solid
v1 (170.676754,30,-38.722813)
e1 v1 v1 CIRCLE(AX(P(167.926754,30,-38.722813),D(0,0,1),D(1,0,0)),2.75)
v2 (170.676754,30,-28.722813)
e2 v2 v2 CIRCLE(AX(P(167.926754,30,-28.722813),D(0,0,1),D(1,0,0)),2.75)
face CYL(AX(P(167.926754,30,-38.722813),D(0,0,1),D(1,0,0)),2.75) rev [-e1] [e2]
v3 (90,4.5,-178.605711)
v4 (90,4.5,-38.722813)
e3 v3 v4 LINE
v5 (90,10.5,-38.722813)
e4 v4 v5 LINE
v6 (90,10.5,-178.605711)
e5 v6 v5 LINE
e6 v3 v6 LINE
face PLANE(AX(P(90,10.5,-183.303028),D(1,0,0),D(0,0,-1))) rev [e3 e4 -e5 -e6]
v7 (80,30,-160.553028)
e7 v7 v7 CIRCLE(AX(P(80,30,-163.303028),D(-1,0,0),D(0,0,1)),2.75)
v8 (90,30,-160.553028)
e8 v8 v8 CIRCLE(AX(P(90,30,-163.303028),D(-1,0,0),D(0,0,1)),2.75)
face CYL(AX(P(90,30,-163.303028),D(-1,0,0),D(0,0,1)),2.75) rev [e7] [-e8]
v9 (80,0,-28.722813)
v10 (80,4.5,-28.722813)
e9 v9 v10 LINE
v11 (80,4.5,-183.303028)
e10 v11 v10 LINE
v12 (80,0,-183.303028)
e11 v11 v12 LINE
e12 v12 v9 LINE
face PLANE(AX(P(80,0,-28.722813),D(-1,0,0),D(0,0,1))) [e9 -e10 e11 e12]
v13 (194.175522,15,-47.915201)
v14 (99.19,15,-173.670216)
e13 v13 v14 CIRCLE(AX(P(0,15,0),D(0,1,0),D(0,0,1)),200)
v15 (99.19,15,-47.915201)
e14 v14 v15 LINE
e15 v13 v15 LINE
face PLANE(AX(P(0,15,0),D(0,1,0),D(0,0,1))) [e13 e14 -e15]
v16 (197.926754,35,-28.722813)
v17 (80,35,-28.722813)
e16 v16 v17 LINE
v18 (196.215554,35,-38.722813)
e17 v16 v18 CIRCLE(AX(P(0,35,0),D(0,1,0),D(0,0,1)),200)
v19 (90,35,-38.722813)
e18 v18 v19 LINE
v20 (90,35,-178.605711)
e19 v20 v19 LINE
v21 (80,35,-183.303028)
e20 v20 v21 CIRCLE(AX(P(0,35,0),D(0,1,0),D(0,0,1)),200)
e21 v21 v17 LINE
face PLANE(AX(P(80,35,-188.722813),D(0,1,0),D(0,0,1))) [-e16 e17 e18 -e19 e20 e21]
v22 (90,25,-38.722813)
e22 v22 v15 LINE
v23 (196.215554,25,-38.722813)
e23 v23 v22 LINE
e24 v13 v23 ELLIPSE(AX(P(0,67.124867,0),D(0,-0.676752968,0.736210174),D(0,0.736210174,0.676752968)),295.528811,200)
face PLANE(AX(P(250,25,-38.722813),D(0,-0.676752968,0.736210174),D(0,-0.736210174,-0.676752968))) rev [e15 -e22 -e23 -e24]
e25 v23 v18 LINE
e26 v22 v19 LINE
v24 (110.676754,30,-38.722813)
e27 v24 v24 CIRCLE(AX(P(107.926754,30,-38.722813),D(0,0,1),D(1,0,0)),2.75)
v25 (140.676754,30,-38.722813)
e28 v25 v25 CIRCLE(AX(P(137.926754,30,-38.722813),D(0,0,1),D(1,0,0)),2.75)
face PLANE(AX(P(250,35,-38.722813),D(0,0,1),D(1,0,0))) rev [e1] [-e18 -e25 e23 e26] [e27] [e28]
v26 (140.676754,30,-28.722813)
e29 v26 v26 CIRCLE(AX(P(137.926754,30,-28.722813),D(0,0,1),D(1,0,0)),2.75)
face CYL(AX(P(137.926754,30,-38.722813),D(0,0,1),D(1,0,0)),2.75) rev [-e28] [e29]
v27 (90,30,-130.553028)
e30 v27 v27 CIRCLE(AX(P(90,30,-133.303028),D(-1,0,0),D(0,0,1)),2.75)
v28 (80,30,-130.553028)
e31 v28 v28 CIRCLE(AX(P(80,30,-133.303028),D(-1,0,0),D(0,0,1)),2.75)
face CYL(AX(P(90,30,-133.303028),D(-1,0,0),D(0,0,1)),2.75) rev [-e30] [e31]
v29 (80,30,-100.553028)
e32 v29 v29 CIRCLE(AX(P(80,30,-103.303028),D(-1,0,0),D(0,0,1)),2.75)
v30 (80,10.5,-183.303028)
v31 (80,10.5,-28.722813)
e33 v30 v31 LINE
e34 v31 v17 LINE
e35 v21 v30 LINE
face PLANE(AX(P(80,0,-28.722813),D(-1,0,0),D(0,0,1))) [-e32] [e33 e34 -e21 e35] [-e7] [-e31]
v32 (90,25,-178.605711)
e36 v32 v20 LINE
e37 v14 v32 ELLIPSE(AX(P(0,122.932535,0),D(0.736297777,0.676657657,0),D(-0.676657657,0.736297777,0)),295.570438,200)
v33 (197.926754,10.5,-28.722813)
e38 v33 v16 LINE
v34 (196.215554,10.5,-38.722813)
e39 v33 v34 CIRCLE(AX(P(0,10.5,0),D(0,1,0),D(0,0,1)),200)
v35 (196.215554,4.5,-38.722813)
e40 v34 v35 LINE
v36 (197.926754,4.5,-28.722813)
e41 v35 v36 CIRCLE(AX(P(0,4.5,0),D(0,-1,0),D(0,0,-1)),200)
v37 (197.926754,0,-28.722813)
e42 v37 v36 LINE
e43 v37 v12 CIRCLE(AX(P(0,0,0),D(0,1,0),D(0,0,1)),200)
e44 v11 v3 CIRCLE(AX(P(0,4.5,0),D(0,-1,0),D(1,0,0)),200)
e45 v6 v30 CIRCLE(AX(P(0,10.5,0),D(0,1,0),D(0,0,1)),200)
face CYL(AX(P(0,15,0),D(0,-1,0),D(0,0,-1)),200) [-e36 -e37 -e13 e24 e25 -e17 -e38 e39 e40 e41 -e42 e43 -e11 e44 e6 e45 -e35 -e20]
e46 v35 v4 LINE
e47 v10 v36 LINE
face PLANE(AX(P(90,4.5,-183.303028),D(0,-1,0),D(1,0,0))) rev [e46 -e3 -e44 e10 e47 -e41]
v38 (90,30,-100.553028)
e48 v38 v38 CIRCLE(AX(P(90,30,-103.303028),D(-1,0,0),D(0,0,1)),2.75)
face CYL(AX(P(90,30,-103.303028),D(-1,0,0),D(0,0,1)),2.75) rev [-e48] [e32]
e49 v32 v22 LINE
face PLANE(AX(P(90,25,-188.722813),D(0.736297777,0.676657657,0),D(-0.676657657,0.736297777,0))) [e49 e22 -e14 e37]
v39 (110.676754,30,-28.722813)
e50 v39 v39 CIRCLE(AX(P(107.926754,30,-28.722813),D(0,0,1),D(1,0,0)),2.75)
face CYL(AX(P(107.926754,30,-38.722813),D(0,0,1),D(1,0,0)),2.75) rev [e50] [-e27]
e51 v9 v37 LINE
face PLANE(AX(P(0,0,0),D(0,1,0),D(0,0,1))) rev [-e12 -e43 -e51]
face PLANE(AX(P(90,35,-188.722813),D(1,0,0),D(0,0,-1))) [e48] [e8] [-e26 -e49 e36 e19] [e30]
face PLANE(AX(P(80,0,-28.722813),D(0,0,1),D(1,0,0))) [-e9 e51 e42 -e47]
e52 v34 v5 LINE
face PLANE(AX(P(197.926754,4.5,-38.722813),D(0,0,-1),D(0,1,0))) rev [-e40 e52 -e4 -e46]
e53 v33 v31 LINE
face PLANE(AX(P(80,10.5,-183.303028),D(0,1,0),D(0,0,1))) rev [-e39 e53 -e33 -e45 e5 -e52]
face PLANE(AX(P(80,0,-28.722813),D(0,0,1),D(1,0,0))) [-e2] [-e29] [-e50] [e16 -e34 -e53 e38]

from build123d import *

# Parameters (mm, degrees)
SKETCH1_R                = 200
BOSS_EXTRUDE1_DEPTH      = 15
BOSS_EXTRUDE2_DEPTH      = 200
CUT_EXTRUDE1_DEPTH       = 286.087705803
CUT_EXTRUDE1_DEPTH_BACK  = 286.087705803
SKETCH3_R                = 85
CUT_EXTRUDE2_DEPTH       = 451.079120005
CUT_EXTRUDE2_DEPTH_BACK  = 451.079120005
SKETCH4_R                = 11
CUT_EXTRUDE3_DEPTH       = 451.079120105
CUT_EXTRUDE3_DEPTH_BACK  = 110
CUT_EXTRUDE4_DEPTH       = 110
BOSS_EXTRUDE3_DEPTH      = 200
CUT_EXTRUDE5_DEPTH       = 286.087705815
CUT_EXTRUDE5_DEPTH_BACK  = 286.087705815
SKETCH7_OUTSIDE_W        = 515.59
SKETCH7_OUTSIDE_H        = 515.59
SKETCH7_OUTSIDE_R        = 200
SKETCH9_R                = 4
BOSS_EXTRUDE4_DEPTH      = 220
CUT_EXTRUDE6_DEPTH       = 190
SKETCH11_R               = 3
CUT_EXTRUDE7_DEPTH       = 486.974499745
CUT_EXTRUDE8_DEPTH       = 300.457843596
CUT_EXTRUDE8_DEPTH_BACK  = 300.457843596
SKETCH12_OUTSIDE_W       = 561.36
SKETCH12_OUTSIDE_H       = 521.36
BOSS_EXTRUDE5_DEPTH      = 160
BOSS_EXTRUDE6_DEPTH      = 160
CUT_EXTRUDE9_START       = 15
CUT_EXTRUDE9_DEPTH       = 20
CUT_EXTRUDE10_DEPTH      = 254.564671702
CUT_EXTRUDE10_DEPTH_BACK = 254.564671702
SKETCH17_W               = 10
SKETCH17_H               = 6
CUT_EXTRUDE11_DEPTH      = 221.752620232
CUT_EXTRUDE11_DEPTH_BACK = 221.752620232
SKETCH18_W               = 10
SKETCH18_H               = 6
SKETCH19_R               = 2.75
CUT_EXTRUDE12_DEPTH      = 10
SKETCH20_R               = 2.75
CUT_EXTRUDE13_DEPTH      = 10


# Read off the part's stored shape, not the designer's step: Cut-Extrude9
with BuildPart() as part:
    # Sketch1 → Boss-Extrude1 (new body)
    with BuildSketch(Plane(origin=(0, 0, 0), x_dir=(1, 0, 0), z_dir=(0, 1, 0))):
        with Locations(Location((0, 0, 0), (0, 0, 270))):
            Circle(SKETCH1_R)
    extrude(amount=BOSS_EXTRUDE1_DEPTH)

    # Sketch2 → Boss-Extrude2 (add, symmetric)
    with BuildSketch(Plane.XY):
        Polygon((-25, 50.707142143), (25, 50.707142143), (60, 15), (-60, 15), align=None)
    extrude(amount=BOSS_EXTRUDE2_DEPTH, both=True)

    # Sketch3 → Cut-Extrude1 (cut, two sides: drawn at the far end of the back side and taken through both)
    with BuildSketch(Plane(origin=(0, 15, 0), x_dir=(1, 0, 0), z_dir=(0, 1, 0)).offset(-CUT_EXTRUDE1_DEPTH_BACK)):
        with Locations(Location((0, 0, 0), (0, 0, 270))):
            Circle(SKETCH3_R)
    extrude(amount=CUT_EXTRUDE1_DEPTH + CUT_EXTRUDE1_DEPTH_BACK, mode=Mode.SUBTRACT)

    # Sketch4 → Cut-Extrude2 (cut, two sides: drawn at the far end of the back side and taken through both)
    with BuildSketch(Plane(origin=(0, 0, -200), x_dir=(-1, 0, 0), z_dir=(0, 0, -1)).offset(-CUT_EXTRUDE2_DEPTH_BACK)):
        with Locations((0, 29)):
            Circle(SKETCH4_R)
    extrude(amount=CUT_EXTRUDE2_DEPTH + CUT_EXTRUDE2_DEPTH_BACK, mode=Mode.SUBTRACT)

    # Sketch5 → Cut-Extrude3 (cut, two sides: drawn at the far end of the back side and taken through both)
    with BuildSketch(Plane.XY.offset(200).offset(-CUT_EXTRUDE3_DEPTH_BACK)):
        Polygon((-25, 50.707142143), (25, 50.707142143), (50.198039412, 25), (25, 25), (25, 15), (-25, 15), (-25, 25), (-50.198039412, 25), align=None)
    extrude(amount=CUT_EXTRUDE3_DEPTH + CUT_EXTRUDE3_DEPTH_BACK, mode=Mode.SUBTRACT)

    # Sketch6 → Cut-Extrude4 (cut)
    with BuildSketch(Plane(origin=(0, 0, -200), x_dir=(-1, 0, 0), z_dir=(0, 0, -1))):
        Polygon((-25, 50.707142143), (25, 50.707142143), (50.198039412, 25), (25, 25), (25, 15), (-25, 15), (-25, 25), (-50.198039412, 25), align=None)
    extrude(amount=-CUT_EXTRUDE4_DEPTH, mode=Mode.SUBTRACT)

    # Sketch8 → Boss-Extrude3 (add, symmetric)
    with BuildSketch(Plane(origin=(0, 0, 0), x_dir=(0, 0, -1), z_dir=(1, 0, 0))):
        Polygon((0, 15), (-20, 15), (-10, 35.712315177), (10, 35.712315177), (20, 15), align=None)
    extrude(amount=BOSS_EXTRUDE3_DEPTH, both=True)

    # Sketch7 outside → Cut-Extrude5 (cut, two sides: drawn at the far end of the back side and taken through both)
    with BuildSketch(Plane(origin=(0, 15, 0), x_dir=(1, 0, 0), z_dir=(0, 1, 0)).offset(-CUT_EXTRUDE5_DEPTH_BACK)):
        Rectangle(SKETCH7_OUTSIDE_W, SKETCH7_OUTSIDE_H)
        with Locations(Location((0, 0, 0), (0, 0, 97.180755781))):
            Circle(SKETCH7_OUTSIDE_R, mode=Mode.SUBTRACT)
    extrude(amount=CUT_EXTRUDE5_DEPTH + CUT_EXTRUDE5_DEPTH_BACK, mode=Mode.SUBTRACT)

    # Sketch9 → Boss-Extrude4 (add, symmetric)
    with BuildSketch(Plane(origin=(0, 0, 0), x_dir=(0, 0, -1), z_dir=(1, 0, 0))):
        with Locations(Location((0, 29, 0), (0, 0, 180))):
            Circle(SKETCH9_R)
    extrude(amount=BOSS_EXTRUDE4_DEPTH, both=True)

    # Sketch10 → Cut-Extrude6 (cut, symmetric)
    with BuildSketch(Plane(origin=(0, 0, 0), x_dir=(0, 0, -1), z_dir=(1, 0, 0))):
        Polygon((-20, 15), (20, 15), (10, 35.712315177), (-10, 35.712315177), align=None)
    extrude(amount=CUT_EXTRUDE6_DEPTH, both=True, mode=Mode.SUBTRACT)

    # Sketch11 → Cut-Extrude7 (cut, through all)
    with BuildSketch(Plane.ZY.offset(220)):
        with Locations((0, 29)):
            Circle(SKETCH11_R)
    extrude(amount=-CUT_EXTRUDE7_DEPTH, mode=Mode.SUBTRACT)

    # Sketch12 outside → Cut-Extrude8 (cut, two sides: drawn at the far end of the back side and taken through both)
    with BuildSketch(Plane(origin=(0, 15, 0), x_dir=(1, 0, 0), z_dir=(0, 1, 0)).offset(-CUT_EXTRUDE8_DEPTH_BACK)):
        Rectangle(SKETCH12_OUTSIDE_W, SKETCH12_OUTSIDE_H)
        Polygon((80, 28.722813233), (80, 205.18025718), (287.401401401, 28.722813233), align=None, mode=Mode.SUBTRACT)
    extrude(amount=CUT_EXTRUDE8_DEPTH + CUT_EXTRUDE8_DEPTH_BACK, mode=Mode.SUBTRACT)

    # Sketch13 → Boss-Extrude5 (add)
    with BuildSketch(Plane.XY.offset(-28.722813233)):
        Polygon((80, 15), (80, 35), (90, 35), (90, 25), (99.19, 15), align=None)
    extrude(amount=-BOSS_EXTRUDE5_DEPTH)

    # Sketch15 → Boss-Extrude6 (add)
    with BuildSketch(Plane(origin=(90, 0, 0), x_dir=(0, 0, -1), z_dir=(1, 0, 0))):
        Polygon((28.722813233, 15), (28.722813233, 35), (38.722813233, 35), (38.722813233, 25), (47.915201388, 15), align=None)
    extrude(amount=BOSS_EXTRUDE6_DEPTH)

    # Cut-Extrude9 outline → Cut-Extrude9 (cut)
    with BuildSketch(Plane(origin=(0, 0, 0), x_dir=(1, 0, 0), z_dir=(0, 1, 0)).offset(CUT_EXTRUDE9_START)):
        with BuildLine():
            Line((78, 184.175899359), (80, 183.303027798))
            ThreePointArc((80, 183.303027798), (159.011260133, 121.307127371), (197.926754129, 28.722813233))
            Line((197.926754129, 28.722813233), (250, 28.722813233))
            Line((250, 28.722813233), (250, 188.722813233))
            Line((250, 188.722813233), (78, 188.722813233))
            Line((78, 188.722813233), (78, 184.175899359))
        make_face()
    extrude(amount=CUT_EXTRUDE9_DEPTH, mode=Mode.SUBTRACT)

    # Sketch17 → Cut-Extrude10 (cut, two sides: drawn at the far end of the back side and taken through both)
    with BuildSketch(Plane.XY.offset(-28.722813233).offset(-CUT_EXTRUDE10_DEPTH_BACK)):
        with Locations((85, 7.5)):
            Rectangle(SKETCH17_W, SKETCH17_H)
    extrude(amount=CUT_EXTRUDE10_DEPTH + CUT_EXTRUDE10_DEPTH_BACK, mode=Mode.SUBTRACT)

    # Sketch18 → Cut-Extrude11 (cut, two sides: drawn at the far end of the back side and taken through both)
    with BuildSketch(Plane.ZY.offset(-80).offset(-CUT_EXTRUDE11_DEPTH_BACK)):
        with Locations((-33.722813233, 7.5)):
            Rectangle(SKETCH18_W, SKETCH18_H)
    extrude(amount=CUT_EXTRUDE11_DEPTH + CUT_EXTRUDE11_DEPTH_BACK, mode=Mode.SUBTRACT)

    # Sketch19 → Cut-Extrude12 (cut)
    with BuildSketch(Plane.XY.offset(-28.722813233)):
        with Locations((107.926754129, 30)):
            Circle(SKETCH19_R)
        with Locations((167.926754129, 30)):
            Circle(SKETCH19_R)
        with Locations((137.926754129, 30)):
            Circle(SKETCH19_R)
    extrude(amount=-CUT_EXTRUDE12_DEPTH, mode=Mode.SUBTRACT)

    # Sketch20 → Cut-Extrude13 (cut)
    with BuildSketch(Plane.ZY.offset(-80)):
        with Locations((-163.303027798, 30)):
            Circle(SKETCH20_R)
        with Locations((-133.303027798, 30)):
            Circle(SKETCH20_R)
        with Locations((-103.303027798, 30)):
            Circle(SKETCH20_R)
    extrude(amount=-CUT_EXTRUDE13_DEPTH, mode=Mode.SUBTRACT)


solid = part.part
